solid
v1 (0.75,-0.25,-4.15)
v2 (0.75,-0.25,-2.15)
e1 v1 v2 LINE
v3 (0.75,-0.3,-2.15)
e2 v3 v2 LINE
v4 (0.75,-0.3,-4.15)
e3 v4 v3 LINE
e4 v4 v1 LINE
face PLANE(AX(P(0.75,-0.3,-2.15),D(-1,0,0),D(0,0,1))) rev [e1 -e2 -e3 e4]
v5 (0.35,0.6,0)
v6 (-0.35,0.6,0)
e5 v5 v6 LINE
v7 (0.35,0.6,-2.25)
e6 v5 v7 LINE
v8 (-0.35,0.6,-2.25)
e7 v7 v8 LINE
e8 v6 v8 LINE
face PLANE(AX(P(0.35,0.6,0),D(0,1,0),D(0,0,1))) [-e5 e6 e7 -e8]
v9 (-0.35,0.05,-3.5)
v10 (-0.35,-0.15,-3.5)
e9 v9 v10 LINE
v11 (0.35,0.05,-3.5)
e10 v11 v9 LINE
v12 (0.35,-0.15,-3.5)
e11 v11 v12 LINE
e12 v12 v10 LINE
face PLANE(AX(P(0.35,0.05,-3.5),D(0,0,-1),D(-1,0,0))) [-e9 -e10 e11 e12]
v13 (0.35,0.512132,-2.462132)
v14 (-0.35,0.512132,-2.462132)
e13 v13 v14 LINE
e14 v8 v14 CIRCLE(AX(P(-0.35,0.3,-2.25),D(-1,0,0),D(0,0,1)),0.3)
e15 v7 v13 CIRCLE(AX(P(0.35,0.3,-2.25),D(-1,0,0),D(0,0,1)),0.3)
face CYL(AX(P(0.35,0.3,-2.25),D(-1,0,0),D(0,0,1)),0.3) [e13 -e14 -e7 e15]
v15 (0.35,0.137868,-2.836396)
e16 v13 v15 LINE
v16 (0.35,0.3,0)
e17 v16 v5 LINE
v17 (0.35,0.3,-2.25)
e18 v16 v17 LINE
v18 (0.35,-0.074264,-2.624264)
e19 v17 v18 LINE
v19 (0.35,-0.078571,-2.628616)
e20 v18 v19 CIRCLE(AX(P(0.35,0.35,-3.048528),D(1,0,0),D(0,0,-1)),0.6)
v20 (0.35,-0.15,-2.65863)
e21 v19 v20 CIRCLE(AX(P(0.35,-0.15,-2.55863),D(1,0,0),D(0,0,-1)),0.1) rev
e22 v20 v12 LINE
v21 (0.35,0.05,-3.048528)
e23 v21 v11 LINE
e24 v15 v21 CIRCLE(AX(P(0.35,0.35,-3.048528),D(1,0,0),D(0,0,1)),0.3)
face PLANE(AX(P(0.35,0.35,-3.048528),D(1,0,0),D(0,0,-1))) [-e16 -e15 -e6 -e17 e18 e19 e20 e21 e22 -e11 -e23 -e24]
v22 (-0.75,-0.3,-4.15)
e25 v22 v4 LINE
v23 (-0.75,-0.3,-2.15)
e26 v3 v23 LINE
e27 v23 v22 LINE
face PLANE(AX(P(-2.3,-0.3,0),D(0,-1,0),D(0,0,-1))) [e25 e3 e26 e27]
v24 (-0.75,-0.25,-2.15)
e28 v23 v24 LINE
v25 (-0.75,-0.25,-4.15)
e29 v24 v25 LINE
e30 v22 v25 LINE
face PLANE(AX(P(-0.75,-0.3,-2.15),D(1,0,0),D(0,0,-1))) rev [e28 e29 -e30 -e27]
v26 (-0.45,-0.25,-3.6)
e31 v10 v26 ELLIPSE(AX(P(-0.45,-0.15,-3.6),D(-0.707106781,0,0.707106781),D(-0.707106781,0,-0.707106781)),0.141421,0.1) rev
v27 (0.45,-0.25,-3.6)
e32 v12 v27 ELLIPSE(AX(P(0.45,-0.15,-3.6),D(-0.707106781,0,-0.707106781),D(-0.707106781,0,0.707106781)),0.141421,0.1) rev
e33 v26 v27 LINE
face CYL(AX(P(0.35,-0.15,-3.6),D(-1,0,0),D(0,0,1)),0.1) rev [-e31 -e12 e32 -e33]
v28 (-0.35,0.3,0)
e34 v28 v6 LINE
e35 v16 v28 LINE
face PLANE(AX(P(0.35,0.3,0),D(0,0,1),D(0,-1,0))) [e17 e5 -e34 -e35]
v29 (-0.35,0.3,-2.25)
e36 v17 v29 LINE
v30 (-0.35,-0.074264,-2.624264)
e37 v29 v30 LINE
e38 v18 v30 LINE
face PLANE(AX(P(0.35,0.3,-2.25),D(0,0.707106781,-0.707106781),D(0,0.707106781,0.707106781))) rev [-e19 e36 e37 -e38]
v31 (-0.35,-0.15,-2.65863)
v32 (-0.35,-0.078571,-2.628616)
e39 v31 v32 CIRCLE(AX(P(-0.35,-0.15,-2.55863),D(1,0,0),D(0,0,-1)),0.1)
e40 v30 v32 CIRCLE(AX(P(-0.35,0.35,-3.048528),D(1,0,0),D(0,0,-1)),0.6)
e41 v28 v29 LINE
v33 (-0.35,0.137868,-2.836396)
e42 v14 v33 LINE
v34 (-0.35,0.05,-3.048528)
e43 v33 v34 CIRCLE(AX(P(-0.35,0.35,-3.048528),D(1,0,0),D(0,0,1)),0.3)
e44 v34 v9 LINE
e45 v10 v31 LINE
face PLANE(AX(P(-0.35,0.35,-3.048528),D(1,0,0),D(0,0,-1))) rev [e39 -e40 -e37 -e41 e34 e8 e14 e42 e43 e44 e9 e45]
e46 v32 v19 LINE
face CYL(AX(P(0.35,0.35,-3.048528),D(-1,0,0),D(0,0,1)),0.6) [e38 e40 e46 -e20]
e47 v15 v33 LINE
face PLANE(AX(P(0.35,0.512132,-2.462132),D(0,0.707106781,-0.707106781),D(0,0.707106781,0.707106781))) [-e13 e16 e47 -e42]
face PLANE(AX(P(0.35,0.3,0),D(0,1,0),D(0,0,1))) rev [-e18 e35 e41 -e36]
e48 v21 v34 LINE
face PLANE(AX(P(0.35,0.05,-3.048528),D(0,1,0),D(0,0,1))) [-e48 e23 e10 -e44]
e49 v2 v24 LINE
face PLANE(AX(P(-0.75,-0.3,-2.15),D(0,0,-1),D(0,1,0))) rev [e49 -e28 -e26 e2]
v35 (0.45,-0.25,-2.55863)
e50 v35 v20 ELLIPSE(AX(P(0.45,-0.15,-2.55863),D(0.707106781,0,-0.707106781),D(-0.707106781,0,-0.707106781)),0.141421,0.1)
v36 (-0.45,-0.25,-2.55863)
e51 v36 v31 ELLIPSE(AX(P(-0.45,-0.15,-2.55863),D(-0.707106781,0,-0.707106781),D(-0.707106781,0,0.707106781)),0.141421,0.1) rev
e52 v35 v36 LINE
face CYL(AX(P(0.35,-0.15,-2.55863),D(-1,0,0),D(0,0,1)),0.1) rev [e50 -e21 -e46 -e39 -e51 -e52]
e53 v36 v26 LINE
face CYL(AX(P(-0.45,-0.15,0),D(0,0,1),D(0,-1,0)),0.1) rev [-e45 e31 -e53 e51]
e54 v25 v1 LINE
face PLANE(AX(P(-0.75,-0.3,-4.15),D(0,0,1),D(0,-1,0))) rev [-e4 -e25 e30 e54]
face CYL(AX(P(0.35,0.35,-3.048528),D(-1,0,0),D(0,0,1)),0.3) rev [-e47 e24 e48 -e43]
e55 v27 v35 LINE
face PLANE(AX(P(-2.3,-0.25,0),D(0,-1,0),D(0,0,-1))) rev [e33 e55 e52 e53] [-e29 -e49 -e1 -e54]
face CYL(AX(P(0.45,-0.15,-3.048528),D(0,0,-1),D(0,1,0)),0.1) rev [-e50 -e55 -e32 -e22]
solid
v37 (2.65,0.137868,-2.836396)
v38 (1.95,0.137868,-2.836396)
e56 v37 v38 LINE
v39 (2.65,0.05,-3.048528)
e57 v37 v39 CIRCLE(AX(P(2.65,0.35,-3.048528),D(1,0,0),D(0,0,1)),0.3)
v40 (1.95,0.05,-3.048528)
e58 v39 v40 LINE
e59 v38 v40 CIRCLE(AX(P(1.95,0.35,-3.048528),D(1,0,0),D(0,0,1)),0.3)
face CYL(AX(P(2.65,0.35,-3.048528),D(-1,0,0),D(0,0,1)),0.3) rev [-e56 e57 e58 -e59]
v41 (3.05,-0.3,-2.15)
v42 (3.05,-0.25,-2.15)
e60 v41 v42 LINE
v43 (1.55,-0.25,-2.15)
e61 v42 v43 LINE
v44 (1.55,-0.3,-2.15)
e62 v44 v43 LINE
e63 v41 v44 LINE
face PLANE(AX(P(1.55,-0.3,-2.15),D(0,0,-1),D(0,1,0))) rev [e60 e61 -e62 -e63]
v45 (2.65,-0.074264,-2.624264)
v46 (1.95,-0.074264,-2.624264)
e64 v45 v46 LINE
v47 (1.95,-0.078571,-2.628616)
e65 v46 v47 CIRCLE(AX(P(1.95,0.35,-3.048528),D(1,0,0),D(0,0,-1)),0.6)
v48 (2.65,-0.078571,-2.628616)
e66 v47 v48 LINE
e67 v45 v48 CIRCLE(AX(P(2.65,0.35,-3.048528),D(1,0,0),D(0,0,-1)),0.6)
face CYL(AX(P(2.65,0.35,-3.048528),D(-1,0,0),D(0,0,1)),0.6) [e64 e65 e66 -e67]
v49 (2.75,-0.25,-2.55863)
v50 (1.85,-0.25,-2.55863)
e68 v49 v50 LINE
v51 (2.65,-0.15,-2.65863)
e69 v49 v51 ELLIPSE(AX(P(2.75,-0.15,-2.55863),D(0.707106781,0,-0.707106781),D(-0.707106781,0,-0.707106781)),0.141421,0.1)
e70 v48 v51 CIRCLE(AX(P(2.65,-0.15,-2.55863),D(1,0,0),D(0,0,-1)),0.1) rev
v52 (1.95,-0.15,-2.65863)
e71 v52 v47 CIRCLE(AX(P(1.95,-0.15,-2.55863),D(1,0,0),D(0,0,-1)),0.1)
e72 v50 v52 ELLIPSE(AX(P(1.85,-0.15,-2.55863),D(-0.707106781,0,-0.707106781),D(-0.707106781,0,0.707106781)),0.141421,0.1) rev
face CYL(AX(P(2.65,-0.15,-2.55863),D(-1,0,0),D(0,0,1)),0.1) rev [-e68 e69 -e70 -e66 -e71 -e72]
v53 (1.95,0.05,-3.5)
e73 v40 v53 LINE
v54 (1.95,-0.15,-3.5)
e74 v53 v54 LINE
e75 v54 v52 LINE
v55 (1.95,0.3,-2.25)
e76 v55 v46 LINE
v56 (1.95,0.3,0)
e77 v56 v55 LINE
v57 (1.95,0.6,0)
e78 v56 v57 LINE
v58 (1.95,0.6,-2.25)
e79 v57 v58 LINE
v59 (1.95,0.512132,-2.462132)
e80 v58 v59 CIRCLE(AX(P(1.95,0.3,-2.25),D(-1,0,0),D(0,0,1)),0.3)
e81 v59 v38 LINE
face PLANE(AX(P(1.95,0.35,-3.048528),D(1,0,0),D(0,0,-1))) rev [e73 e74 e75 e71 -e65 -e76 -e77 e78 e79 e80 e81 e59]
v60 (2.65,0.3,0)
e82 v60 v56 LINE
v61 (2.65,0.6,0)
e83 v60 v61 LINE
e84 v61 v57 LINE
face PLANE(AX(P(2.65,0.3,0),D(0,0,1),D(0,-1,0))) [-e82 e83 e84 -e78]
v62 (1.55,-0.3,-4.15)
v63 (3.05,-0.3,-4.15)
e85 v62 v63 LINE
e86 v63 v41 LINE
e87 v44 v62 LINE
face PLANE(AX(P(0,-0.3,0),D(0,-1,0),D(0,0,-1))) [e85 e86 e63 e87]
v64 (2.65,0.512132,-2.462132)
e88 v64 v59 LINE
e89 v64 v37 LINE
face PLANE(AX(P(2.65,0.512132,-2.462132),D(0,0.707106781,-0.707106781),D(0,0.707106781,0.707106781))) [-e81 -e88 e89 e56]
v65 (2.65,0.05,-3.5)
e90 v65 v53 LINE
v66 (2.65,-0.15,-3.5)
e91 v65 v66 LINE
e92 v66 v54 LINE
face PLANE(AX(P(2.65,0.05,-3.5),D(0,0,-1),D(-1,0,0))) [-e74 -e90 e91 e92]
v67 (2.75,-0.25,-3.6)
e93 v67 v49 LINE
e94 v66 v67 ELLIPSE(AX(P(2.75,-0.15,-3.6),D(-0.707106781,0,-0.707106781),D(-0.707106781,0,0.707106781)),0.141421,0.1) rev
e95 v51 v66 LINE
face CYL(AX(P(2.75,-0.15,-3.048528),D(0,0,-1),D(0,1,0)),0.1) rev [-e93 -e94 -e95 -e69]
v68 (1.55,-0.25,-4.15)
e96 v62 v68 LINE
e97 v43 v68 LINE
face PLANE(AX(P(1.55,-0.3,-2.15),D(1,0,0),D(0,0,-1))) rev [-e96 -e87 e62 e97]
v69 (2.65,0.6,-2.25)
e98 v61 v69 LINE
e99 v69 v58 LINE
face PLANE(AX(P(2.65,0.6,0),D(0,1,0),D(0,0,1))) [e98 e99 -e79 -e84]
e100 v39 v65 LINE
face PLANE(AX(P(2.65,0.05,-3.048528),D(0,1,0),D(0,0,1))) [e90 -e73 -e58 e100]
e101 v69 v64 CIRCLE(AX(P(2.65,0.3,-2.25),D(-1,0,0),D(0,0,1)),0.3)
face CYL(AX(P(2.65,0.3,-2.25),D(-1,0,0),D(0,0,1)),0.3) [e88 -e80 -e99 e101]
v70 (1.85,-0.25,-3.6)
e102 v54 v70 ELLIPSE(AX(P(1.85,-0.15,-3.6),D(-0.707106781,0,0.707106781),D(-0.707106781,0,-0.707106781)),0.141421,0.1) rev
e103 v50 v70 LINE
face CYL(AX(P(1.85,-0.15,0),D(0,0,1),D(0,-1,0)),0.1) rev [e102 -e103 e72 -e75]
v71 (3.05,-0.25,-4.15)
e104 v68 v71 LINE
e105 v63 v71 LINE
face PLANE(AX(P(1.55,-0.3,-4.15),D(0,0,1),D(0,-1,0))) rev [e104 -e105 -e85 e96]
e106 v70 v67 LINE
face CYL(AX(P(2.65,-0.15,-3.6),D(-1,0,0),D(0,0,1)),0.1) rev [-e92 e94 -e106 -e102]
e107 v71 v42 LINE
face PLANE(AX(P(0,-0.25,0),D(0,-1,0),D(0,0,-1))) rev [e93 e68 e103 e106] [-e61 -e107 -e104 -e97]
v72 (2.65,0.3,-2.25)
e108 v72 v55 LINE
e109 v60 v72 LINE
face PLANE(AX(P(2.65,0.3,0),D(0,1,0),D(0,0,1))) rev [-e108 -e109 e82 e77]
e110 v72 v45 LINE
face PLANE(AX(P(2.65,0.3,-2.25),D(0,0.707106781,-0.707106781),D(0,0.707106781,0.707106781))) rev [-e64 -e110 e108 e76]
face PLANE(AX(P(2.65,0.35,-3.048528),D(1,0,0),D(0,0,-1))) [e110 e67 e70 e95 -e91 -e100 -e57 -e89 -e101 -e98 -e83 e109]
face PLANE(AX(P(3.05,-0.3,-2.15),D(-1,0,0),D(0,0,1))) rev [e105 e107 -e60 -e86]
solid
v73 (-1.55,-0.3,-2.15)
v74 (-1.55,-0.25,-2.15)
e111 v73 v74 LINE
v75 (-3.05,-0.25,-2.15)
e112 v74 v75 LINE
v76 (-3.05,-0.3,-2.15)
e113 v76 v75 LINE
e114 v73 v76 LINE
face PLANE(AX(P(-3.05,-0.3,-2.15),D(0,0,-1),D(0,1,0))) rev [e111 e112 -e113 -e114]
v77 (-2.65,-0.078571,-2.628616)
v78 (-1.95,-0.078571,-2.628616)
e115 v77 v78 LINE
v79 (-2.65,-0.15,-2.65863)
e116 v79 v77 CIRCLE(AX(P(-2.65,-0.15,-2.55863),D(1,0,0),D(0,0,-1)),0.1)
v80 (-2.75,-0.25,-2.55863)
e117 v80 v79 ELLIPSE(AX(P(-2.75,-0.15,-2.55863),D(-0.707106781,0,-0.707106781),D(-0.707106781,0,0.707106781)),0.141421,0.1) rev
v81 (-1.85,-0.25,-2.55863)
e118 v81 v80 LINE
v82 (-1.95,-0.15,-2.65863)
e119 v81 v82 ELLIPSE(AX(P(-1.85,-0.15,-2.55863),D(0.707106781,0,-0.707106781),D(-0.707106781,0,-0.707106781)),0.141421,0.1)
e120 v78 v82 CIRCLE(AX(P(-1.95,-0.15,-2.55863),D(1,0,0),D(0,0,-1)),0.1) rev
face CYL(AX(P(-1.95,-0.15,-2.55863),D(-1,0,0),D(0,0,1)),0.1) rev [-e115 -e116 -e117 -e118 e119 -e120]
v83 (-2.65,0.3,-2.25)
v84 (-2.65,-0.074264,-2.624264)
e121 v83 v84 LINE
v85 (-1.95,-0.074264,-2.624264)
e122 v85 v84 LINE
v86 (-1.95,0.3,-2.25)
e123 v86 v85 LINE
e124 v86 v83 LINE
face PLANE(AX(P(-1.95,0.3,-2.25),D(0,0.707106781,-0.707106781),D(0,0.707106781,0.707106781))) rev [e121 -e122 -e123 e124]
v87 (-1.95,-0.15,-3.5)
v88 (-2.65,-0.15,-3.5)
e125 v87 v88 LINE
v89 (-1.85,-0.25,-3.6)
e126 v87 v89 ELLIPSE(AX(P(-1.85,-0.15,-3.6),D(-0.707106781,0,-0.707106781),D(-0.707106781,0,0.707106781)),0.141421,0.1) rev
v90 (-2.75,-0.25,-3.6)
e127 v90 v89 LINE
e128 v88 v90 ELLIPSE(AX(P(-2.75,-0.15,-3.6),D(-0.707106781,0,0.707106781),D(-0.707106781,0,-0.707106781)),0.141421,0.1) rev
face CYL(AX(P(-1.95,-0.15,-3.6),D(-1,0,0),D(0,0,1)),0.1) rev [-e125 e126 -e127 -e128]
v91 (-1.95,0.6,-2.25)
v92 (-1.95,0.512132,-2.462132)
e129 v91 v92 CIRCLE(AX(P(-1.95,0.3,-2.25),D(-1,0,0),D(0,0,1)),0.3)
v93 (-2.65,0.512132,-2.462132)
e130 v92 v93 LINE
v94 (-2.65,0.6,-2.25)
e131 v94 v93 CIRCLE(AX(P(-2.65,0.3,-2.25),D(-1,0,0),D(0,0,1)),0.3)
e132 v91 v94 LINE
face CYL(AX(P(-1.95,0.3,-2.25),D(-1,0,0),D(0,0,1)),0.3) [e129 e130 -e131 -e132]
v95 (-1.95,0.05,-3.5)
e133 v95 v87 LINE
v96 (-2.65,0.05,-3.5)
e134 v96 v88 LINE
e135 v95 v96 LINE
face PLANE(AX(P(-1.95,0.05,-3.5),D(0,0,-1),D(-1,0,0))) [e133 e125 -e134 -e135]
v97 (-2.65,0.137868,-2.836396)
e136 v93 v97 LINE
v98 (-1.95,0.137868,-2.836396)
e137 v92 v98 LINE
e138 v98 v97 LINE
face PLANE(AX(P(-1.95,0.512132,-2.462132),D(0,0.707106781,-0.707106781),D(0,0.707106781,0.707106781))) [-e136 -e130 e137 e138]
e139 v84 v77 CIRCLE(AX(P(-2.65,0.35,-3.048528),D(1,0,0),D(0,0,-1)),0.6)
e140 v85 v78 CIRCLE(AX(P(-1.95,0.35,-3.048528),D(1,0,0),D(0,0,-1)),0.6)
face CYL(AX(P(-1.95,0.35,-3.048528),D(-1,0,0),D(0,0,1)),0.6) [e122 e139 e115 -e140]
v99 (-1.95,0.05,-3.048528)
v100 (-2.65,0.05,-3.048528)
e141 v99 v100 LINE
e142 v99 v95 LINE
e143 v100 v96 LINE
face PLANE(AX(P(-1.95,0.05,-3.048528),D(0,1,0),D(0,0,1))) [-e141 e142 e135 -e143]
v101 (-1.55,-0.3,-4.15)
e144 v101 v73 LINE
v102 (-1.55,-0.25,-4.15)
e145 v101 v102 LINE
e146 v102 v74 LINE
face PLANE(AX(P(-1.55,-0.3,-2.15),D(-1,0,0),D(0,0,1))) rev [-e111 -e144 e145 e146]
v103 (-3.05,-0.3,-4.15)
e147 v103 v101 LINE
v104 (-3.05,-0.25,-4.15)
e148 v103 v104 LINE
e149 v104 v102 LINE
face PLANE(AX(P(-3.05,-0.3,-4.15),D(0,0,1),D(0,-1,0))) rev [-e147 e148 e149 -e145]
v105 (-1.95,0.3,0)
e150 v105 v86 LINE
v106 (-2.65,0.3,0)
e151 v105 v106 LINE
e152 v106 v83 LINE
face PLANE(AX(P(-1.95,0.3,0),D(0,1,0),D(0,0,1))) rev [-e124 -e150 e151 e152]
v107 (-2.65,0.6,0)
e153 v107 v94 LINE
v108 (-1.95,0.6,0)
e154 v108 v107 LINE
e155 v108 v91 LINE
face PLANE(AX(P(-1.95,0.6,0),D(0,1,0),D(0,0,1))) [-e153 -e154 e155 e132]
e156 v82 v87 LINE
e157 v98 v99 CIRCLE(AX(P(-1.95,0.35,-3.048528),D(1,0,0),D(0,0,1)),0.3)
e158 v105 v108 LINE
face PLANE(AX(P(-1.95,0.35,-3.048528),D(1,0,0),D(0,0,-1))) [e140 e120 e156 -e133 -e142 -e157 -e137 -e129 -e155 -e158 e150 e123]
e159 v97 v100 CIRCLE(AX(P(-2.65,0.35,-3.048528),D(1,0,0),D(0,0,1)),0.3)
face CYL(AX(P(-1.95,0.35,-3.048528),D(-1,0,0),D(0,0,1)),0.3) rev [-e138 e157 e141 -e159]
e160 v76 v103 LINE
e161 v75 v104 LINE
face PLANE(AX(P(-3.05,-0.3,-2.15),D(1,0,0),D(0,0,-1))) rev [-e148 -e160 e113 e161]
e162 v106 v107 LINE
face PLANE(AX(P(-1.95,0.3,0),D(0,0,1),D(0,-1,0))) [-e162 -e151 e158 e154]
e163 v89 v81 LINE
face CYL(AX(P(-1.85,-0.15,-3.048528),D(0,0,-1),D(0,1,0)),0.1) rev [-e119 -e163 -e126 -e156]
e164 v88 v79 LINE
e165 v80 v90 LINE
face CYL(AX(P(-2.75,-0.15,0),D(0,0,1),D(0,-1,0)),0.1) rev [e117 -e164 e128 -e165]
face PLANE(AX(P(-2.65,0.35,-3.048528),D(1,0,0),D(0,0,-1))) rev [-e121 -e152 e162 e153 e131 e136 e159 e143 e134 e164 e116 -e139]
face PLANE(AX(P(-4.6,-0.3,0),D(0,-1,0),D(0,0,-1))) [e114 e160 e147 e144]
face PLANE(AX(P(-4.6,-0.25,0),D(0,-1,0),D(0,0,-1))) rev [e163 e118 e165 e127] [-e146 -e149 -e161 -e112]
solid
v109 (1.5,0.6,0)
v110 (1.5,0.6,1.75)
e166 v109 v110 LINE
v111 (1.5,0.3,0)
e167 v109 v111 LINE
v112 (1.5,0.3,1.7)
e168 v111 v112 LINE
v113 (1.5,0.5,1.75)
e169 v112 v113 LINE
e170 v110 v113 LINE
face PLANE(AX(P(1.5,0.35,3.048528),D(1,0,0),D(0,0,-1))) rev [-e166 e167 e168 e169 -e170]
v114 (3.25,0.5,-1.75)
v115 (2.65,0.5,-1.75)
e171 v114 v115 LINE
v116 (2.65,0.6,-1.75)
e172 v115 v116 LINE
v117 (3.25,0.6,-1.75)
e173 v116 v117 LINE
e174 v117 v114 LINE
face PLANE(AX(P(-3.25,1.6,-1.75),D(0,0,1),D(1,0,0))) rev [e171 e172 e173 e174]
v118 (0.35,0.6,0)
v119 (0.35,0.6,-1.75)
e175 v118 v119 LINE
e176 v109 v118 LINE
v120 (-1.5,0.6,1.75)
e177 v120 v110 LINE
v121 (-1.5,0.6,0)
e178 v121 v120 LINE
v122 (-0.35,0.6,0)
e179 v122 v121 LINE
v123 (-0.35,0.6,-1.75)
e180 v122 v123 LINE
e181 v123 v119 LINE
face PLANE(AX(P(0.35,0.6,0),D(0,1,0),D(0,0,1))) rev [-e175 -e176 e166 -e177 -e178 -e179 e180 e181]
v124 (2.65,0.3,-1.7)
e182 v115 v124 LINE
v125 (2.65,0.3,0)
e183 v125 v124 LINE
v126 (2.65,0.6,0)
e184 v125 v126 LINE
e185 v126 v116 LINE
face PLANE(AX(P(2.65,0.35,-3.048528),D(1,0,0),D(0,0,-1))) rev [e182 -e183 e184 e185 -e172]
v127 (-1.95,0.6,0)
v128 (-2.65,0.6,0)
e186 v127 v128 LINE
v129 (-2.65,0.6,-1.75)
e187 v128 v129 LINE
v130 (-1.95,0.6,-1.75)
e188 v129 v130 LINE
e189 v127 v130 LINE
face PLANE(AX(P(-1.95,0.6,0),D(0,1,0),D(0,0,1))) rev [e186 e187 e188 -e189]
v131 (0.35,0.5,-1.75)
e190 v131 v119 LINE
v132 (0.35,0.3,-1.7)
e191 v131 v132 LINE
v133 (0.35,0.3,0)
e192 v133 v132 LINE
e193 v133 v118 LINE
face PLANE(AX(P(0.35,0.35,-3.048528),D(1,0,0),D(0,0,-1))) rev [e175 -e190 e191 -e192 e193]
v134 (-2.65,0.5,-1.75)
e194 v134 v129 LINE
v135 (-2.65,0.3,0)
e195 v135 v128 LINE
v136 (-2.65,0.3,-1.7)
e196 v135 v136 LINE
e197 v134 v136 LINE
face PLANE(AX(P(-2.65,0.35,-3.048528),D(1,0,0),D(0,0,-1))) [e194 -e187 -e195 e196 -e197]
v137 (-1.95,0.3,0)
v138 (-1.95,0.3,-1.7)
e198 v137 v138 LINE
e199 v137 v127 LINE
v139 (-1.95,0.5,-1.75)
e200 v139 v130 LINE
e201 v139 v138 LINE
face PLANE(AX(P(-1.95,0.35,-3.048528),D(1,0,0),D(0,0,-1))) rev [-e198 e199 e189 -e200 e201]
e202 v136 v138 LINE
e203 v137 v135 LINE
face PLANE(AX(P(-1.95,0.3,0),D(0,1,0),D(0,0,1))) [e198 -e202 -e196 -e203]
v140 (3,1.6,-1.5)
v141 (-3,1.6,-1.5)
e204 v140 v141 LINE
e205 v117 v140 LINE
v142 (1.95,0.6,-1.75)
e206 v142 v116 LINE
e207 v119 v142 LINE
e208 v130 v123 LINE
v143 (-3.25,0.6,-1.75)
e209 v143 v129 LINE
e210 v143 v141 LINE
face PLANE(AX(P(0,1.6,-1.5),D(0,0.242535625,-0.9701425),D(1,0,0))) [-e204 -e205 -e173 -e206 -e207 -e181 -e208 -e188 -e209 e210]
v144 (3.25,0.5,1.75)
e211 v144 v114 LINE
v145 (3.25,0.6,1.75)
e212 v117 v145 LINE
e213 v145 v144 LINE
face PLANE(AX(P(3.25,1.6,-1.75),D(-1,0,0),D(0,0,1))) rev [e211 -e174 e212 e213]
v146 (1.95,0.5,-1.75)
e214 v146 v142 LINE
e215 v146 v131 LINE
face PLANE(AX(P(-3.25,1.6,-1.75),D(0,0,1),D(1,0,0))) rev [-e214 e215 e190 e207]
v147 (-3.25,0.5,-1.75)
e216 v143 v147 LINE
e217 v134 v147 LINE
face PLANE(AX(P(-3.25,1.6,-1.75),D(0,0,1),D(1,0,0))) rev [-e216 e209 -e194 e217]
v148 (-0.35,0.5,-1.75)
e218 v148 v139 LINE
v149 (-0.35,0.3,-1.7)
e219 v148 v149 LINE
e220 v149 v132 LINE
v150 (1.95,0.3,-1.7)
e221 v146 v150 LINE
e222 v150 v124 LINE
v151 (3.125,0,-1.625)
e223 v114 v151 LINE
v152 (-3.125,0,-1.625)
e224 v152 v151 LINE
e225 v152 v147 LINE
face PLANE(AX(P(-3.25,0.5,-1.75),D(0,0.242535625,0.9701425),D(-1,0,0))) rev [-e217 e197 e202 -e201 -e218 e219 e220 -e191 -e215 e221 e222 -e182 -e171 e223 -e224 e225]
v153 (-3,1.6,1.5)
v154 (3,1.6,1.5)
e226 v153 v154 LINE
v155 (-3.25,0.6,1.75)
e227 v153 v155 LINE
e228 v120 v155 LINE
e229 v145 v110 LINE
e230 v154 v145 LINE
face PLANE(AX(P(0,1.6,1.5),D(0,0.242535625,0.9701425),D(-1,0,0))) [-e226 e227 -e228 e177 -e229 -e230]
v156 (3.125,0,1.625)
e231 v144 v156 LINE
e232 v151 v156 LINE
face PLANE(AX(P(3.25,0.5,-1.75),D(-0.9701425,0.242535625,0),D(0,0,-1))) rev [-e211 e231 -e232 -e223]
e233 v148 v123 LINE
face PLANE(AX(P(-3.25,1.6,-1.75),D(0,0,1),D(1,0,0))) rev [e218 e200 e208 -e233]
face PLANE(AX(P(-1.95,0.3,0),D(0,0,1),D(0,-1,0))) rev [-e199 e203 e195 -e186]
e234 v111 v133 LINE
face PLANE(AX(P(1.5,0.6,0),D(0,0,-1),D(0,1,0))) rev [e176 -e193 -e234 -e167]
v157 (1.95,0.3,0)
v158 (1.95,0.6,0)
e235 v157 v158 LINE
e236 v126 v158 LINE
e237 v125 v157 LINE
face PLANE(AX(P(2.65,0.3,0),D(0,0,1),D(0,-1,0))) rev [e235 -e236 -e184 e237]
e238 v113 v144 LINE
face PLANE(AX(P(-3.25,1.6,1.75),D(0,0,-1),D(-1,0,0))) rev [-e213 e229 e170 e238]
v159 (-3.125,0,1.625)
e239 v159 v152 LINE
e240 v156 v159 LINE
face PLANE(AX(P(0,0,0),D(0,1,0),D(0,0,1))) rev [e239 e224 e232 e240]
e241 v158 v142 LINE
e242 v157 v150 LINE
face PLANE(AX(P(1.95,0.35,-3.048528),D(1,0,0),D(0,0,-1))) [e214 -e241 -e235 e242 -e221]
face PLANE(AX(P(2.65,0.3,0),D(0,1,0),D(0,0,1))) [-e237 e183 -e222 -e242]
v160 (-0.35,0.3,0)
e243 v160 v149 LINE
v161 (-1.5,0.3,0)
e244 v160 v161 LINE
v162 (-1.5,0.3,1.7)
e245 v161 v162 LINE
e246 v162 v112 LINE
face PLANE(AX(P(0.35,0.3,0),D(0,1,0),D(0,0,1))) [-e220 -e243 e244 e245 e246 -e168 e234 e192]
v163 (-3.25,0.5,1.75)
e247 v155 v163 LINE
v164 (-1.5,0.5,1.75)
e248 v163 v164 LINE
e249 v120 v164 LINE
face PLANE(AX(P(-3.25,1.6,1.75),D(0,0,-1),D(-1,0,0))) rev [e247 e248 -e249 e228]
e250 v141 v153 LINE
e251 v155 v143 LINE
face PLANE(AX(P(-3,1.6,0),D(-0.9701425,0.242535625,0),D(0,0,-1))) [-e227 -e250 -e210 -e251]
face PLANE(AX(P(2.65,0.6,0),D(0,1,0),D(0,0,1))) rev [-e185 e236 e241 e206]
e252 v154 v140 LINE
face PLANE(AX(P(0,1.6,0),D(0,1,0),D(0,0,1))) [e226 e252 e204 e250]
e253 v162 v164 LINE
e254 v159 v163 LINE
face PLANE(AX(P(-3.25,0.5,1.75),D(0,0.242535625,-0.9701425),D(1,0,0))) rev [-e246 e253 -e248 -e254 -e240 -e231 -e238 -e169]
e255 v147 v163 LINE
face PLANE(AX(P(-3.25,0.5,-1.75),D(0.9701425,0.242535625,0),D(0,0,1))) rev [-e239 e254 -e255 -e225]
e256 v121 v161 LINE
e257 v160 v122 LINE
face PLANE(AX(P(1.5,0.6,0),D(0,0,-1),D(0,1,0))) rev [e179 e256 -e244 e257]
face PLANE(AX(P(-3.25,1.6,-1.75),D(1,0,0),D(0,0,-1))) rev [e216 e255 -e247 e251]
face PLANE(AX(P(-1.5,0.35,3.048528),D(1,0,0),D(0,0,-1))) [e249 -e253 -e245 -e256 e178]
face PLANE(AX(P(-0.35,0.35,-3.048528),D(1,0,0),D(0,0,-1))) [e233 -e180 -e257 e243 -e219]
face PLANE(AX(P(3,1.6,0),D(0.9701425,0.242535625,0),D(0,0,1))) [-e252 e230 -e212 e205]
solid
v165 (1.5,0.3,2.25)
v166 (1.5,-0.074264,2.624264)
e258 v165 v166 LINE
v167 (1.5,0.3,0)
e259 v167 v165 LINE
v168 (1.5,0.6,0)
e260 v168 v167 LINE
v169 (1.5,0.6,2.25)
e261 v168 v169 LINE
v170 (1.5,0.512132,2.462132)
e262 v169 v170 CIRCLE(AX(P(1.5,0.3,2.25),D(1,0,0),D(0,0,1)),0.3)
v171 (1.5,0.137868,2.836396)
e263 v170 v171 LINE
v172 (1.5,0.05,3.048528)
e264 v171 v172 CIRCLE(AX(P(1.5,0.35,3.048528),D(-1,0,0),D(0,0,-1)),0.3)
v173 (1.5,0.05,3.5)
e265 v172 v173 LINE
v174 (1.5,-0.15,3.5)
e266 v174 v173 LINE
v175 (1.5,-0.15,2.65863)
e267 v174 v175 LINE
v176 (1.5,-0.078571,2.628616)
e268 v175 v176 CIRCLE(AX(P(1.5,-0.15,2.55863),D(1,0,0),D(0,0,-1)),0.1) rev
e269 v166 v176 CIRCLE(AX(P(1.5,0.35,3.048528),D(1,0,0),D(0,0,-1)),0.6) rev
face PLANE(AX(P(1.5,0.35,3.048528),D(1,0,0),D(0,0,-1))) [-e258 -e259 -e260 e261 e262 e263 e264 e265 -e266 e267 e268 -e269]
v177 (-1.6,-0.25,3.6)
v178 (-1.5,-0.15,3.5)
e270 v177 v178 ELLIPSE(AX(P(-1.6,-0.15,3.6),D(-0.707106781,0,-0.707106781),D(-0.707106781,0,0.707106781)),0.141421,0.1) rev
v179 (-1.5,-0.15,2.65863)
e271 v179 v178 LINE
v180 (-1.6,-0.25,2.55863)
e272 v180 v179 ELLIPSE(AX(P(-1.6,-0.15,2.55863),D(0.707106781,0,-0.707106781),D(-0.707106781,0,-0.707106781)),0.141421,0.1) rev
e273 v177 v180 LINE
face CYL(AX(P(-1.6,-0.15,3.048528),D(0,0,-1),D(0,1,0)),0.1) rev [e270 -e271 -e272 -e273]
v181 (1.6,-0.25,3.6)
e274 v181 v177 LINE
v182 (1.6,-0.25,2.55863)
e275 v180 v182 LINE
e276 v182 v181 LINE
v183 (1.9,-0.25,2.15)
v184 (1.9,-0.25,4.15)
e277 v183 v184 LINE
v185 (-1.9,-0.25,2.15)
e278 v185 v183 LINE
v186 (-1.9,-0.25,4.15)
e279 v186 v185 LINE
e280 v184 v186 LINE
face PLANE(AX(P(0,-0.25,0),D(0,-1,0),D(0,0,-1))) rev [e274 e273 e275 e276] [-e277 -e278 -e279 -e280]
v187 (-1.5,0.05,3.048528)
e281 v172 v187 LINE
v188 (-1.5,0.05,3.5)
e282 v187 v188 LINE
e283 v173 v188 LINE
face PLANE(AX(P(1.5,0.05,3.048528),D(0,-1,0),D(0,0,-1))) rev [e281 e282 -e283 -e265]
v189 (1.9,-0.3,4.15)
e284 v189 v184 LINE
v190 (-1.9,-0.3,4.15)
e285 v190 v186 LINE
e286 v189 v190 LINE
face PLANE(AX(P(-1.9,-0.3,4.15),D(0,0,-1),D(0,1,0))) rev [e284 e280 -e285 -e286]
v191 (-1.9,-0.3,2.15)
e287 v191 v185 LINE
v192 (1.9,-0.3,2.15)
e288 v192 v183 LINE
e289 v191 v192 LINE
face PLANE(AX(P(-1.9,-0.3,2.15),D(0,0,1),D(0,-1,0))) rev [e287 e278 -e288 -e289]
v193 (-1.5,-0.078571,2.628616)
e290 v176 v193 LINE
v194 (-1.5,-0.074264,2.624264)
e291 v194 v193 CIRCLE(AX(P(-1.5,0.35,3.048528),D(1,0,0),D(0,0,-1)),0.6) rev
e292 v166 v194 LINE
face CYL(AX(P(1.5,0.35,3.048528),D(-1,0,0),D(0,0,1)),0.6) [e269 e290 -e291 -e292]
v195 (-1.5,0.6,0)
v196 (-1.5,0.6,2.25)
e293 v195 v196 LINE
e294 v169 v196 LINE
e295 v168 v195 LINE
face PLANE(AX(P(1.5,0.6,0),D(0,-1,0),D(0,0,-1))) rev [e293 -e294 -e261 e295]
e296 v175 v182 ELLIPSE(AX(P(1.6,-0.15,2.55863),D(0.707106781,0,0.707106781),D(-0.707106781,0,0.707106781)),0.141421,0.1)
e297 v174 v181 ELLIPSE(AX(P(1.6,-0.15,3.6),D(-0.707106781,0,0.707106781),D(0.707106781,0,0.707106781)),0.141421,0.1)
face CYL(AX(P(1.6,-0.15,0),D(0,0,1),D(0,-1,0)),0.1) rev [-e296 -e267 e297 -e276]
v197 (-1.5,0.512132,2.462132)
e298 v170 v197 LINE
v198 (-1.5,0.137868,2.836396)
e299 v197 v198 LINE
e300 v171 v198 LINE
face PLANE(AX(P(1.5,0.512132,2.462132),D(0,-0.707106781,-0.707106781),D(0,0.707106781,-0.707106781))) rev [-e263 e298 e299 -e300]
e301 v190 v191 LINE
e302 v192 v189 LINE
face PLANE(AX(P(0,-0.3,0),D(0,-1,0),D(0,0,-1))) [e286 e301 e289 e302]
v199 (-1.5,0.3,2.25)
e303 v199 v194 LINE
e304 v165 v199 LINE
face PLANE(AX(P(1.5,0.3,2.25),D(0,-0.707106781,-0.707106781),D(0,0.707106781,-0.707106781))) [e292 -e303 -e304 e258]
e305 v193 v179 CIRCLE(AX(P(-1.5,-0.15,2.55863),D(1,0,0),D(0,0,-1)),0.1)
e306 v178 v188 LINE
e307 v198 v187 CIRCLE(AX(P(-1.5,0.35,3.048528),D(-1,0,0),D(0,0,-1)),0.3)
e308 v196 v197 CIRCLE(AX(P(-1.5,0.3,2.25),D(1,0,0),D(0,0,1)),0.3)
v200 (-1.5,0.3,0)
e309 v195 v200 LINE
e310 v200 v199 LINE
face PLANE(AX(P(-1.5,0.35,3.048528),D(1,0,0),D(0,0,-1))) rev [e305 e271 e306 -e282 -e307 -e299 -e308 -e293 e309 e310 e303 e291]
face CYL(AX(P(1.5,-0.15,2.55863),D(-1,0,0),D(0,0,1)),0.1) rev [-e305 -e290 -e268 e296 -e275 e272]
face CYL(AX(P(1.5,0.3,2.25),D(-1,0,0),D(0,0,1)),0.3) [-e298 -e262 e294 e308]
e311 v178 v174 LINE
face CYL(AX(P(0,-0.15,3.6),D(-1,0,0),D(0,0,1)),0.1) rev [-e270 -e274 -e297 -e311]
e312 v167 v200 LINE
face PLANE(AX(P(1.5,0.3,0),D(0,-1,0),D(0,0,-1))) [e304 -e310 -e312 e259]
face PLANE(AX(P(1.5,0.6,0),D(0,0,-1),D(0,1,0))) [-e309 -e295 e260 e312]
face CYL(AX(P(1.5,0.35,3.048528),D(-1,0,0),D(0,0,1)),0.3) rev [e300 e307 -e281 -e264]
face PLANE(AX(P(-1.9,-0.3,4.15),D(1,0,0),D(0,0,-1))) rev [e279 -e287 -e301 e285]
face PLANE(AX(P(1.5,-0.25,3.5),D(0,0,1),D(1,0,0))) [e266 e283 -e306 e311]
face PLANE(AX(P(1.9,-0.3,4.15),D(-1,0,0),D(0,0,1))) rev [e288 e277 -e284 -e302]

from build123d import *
from OCP.BRepFilletAPI import BRepFilletAPI_MakeChamfer

# Parameters (mm, degrees)
BOSS_EXTRUDE1_DEPTH   = 1.6
CHAMFER1_SIZE         = 1
CHAMFER1_SIZE2        = 0.25
CHAMFER2_SIZE         = 0.125
CHAMFER2_SIZE2        = 0.5
EXTRUDE_THIN1_DEPTH   = 1.5
EXTRUDE_THIN2_DEPTH   = 0.35
BOSS_EXTRUDE2_DEPTH   = 0.05
FILLET1_R             = 0.1
FILLET2_R             = 0.1
LPATTERN1_START       = -2.75
LPATTERN1_DEPTH       = 0.9
LPATTERN1_START_2     = -3.05
LPATTERN1_2_OUTLINE_W = 0.04999999999999999
LPATTERN1_2_OUTLINE_H = 2.0000000000000004
LPATTERN1_2_DEPTH     = 1.5
LPATTERN1_START_3     = -5
LPATTERN1_3_DEPTH     = 5
LPATTERN1_START_4     = -0.45
LPATTERN1_4_DEPTH     = 0.9
LPATTERN1_START_5     = -0.75
LPATTERN1_5_OUTLINE_W = 0.04999999999999999
LPATTERN1_5_OUTLINE_H = 2.0000000000000004
LPATTERN1_5_DEPTH     = 1.5
LPATTERN1_6_DEPTH     = 5
INDENT1_START         = -1.5
INDENT1_DEPTH         = 3
INDENT1_START_2       = -2.65
INDENT1_2_DEPTH       = 0.7
INDENT1_START_3       = -0.35
INDENT1_3_DEPTH       = 0.7
INDENT1_START_4       = 1.95
INDENT1_4_DEPTH       = 0.7


with BuildPart() as part:
    # Sketch1 → Boss-Extrude1 (new body)
    with BuildSketch(Plane(origin=(0, 0, 0), x_dir=(1, 0, 0), z_dir=(0, 1, 0))):
        Polygon((-3.2500000000000004, 1.7500000000000002), (3.2499999999999996, 1.7500000000000002), (3.25, -1.75), (-3.2500000000000004, -1.749999999999998), align=None)
    extrude(amount=BOSS_EXTRUDE1_DEPTH)

    # Chamfer1: one chamfer whose edges measure the first distance from different faces: ONE call of the kernel's chamfer builder (chamfer() names one face for all edges)
    chamfer1_edges_1 = [part.edges().sort_by_distance(p)[0] for p in [
        (-3.2500000000000004, 1.6, -1.11e-15),
    ]]
    chamfer1_side_1 = [part.faces().sort_by_distance(p)[0] for p in [
        (-3.2500000000000004, 0.8, -1.17e-15),
    ]]
    chamfer1_edges_2 = [part.edges().sort_by_distance(p)[0] for p in [
        (0, 1.6, 1.7499999999999991),
    ]]
    chamfer1_side_2 = [part.faces().sort_by_distance(p)[0] for p in [
        (-6e-17, 0.8, 1.7499999999999991),
    ]]
    chamfer1_edges_3 = [part.edges().sort_by_distance(p)[0] for p in [
        (3.25, 1.6, -2.2e-16),
    ]]
    chamfer1_side_3 = [part.faces().sort_by_distance(p)[0] for p in [
        (3.25, 0.8, -1.6e-16),
    ]]
    chamfer1_edges_4 = [part.edges().sort_by_distance(p)[0] for p in [
        (-4.4e-16, 1.6, -1.7500000000000002),
    ]]
    chamfer1_side_4 = [part.faces().sort_by_distance(p)[0] for p in [
        (-4.3e-16, 0.8, -1.7500000000000002),
    ]]
    chamfer1 = BRepFilletAPI_MakeChamfer(part.part.solid().wrapped)
    for e in chamfer1_edges_1:
        chamfer1.Add(CHAMFER1_SIZE, CHAMFER1_SIZE2, e.wrapped, chamfer1_side_1[0].wrapped)  # the first distance lies on this face
    for e in chamfer1_edges_2:
        chamfer1.Add(CHAMFER1_SIZE, CHAMFER1_SIZE2, e.wrapped, chamfer1_side_2[0].wrapped)  # the first distance lies on this face
    for e in chamfer1_edges_3:
        chamfer1.Add(CHAMFER1_SIZE, CHAMFER1_SIZE2, e.wrapped, chamfer1_side_3[0].wrapped)  # the first distance lies on this face
    for e in chamfer1_edges_4:
        chamfer1.Add(CHAMFER1_SIZE, CHAMFER1_SIZE2, e.wrapped, chamfer1_side_4[0].wrapped)  # the first distance lies on this face
    add(Compound.cast(chamfer1.Shape()), mode=Mode.REPLACE)

    # Chamfer2
    chamfer2_edges = [part.edges().sort_by_distance(p)[0] for p in [
        (0, 0, 1.7499999999999991),
        (-3.2500000000000004, 0, -1.11e-15),
        (-4.4e-16, 0, -1.7500000000000002),
        (3.25, 0, -2.2e-16),
    ]]
    chamfer2_side = [part.faces().sort_by_distance(p)[0] for p in [
        (4e-17, 0, -5.8e-16),
    ]]
    chamfer(chamfer2_edges, length=CHAMFER2_SIZE, length2=CHAMFER2_SIZE2, reference=chamfer2_side[0])

    # Indent1: read off the stored shape, not the designer's step
    # Indent1 outline → Indent1 (cut)
    with BuildSketch(Plane.YZ.offset(INDENT1_START)):
        Polygon((0.3, 0), (0.6, 0), (0.6, 1.75), (0.5, 1.75), (0.3, 1.7), align=None)
    extrude(amount=INDENT1_DEPTH, mode=Mode.SUBTRACT)

    # Indent1 2 outline → Indent1 2 (cut)
    with BuildSketch(Plane.YZ.offset(INDENT1_START_2)):
        Polygon((0.5, -1.75), (0.6, -1.75), (0.6, 0), (0.3, 0), (0.3, -1.7), align=None)
    extrude(amount=INDENT1_2_DEPTH, mode=Mode.SUBTRACT)

    # Indent1 3 outline → Indent1 3 (cut)
    with BuildSketch(Plane.YZ.offset(INDENT1_START_3)):
        Polygon((0.5, -1.75), (0.6, -1.75), (0.6, 0), (0.3, 0), (0.3, -1.7), align=None)
    extrude(amount=INDENT1_3_DEPTH, mode=Mode.SUBTRACT)

    # Indent1 4 outline → Indent1 4 (cut)
    with BuildSketch(Plane.YZ.offset(INDENT1_START_4)):
        Polygon((0.5, -1.75), (0.6, -1.75), (0.6, 0), (0.3, 0), (0.3, -1.7), align=None)
    extrude(amount=INDENT1_4_DEPTH, mode=Mode.SUBTRACT)


with BuildPart() as body_2:
    # Sketch2 → Extrude-Thin1 (new, symmetric)
    with BuildSketch(Plane(origin=(0, 0, 0), x_dir=(0, 0, -1), z_dir=(1, 0, 0))):
        with BuildLine():
            Line((0, 0.6), (-2.25, 0.5999999999999998))
            ThreePointArc((-2.25, 0.5999999999999998), (-2.3648050297095278, 0.577163859753389), (-2.4621320343559647, 0.5121320343559638))
            Line((-2.4621320343559647, 0.5121320343559638), (-2.836396103067891, 0.13786796564403583))
            ThreePointArc((-2.836396103067891, 0.13786796564403583), (-2.9337231077143313, 0.07283614024661894), (-3.048528137423855, 0.04999999999999964))
            Line((-3.048528137423855, 0.04999999999999964), (-3.5, 0.04999999999999957))
            Line((-3.5, 0.04999999999999957), (-3.5, -0.25000000000000044))
            Line((-3.5, -0.25000000000000044), (-3.048528137423855, -0.25000000000000033))
            ThreePointArc((-3.048528137423839, -0.2500000000000004), (-2.8189180780047915, -0.20432771950676182), (-2.6242640687119105, -0.07426406871192798))
            Line((-2.624264068711926, -0.07426406871192787), (-2.25, 0.30000000000000004))
            Line((-2.25, 0.29999999999999977), (3e-17, 0.3))
            Line((3e-17, 0.3), (0, 0.6))
        make_face()
    extrude(amount=EXTRUDE_THIN1_DEPTH, both=True)



with BuildPart() as body_3:
    # Sketch3 → Extrude-Thin2 (new, symmetric)
    with BuildSketch(Plane(origin=(2.3, 0, 0), x_dir=(0, 0, -1), z_dir=(1, 0, 0))):
        with BuildLine():
            Line((0, 0.6), (2.25, 0.5999999999999998))
            ThreePointArc((2.25, 0.5999999999999998), (2.364805029709526, 0.5771638597533844), (2.4621320343559647, 0.5121320343559636))
            Line((2.4621320343559647, 0.5121320343559636), (2.836396103067891, 0.13786796564403606))
            ThreePointArc((2.836396103067891, 0.13786796564403606), (2.933723107714331, 0.0728361402466185), (3.048528137423855, 0.05000000000000013))
            Line((3.048528137423855, 0.05000000000000013), (3.5, 0.05000000000000001))
            Line((3.5, 0.05000000000000001), (3.5, -0.24999999999999997))
            Line((3.5, -0.24999999999999997), (3.048528137423855, -0.24999999999999986))
            ThreePointArc((3.0485281374238418, -0.24999999999999994), (2.8189180780047933, -0.20432771950676315), (2.6242640687119128, -0.07426406871192781))
            Line((2.624264068711926, -0.07426406871192778), (2.25, 0.2999999999999997))
            Line((2.25, 0.29999999999999977), (-3e-17, 0.3))
            Line((-3e-17, 0.3), (0, 0.6))
        make_face()
    extrude(amount=EXTRUDE_THIN2_DEPTH, both=True)


with BuildPart() as body_2_1:
    add(body_2.part)

    add(body_3.part)  # Boss-Extrude2 merges body 3
    # Sketch4 → Boss-Extrude2 (add)
    with BuildSketch(Plane.XZ.offset(0.24999999999999903)):
        Polygon((1.5499999999999998, -2.1499999999999995), (3.05, -2.1499999999999995), (3.05, -4.1499999999999995), (1.55, -4.1499999999999995), align=None)
        Polygon((-1.8999999999999984, 4.1499999999999995), (1.9000000000000012, 4.15), (1.9000000000000017, 2.149999999999999), (-1.8999999999999984, 2.149999999999999), align=None)
    extrude(amount=BOSS_EXTRUDE2_DEPTH)

    # Fillet1
    fillet1_edges = [body_2_1.edges().sort_by_distance(p)[0] for p in [
        (1.9499999999999997, -0.24999999999999992, -3.2742640687119273),
        (2.3, -0.2499999999999999, -3.0485281374238484),
        (2.3, -0.24999999999999997, -3.5),
        (2.65, -0.24999999999999992, -3.2742640687119273),
    ]]
    fillet(fillet1_edges, radius=FILLET1_R)

    # Fillet2
    fillet2_edges = [body_2_1.edges().sort_by_distance(p)[0] for p in [
        (1.5, -0.2500000000000004, 3.2742640687119273),
        (-1.5, -0.2500000000000004, 3.2742640687119273),
        (0, -0.25000000000000033, 3.048528137423847),
        (0, -0.25000000000000044, 3.5),
    ]]
    fillet(fillet2_edges, radius=FILLET2_R)


with BuildPart() as body_3_2:
    # LPattern1: read off the stored shape, not the designer's step
    # LPattern1 outline → LPattern1 (new body)
    with BuildSketch(Plane.YZ.offset(LPATTERN1_START)):
        with BuildLine():
            ThreePointArc((-0.25, -3.6), (-0.220710678, -3.529289322), (-0.15, -3.5))
            Line((-0.15, -3.5), (0.05, -3.5))
            Line((0.05, -3.5), (0.05, -3.048528137))
            ThreePointArc((0.05, -3.048528137), (0.07283614, -2.933723107), (0.137867966, -2.836396103))
            Line((0.137867966, -2.836396103), (0.512132034, -2.462132034))
            ThreePointArc((0.512132034, -2.462132034), (0.57716386, -2.36480503), (0.6, -2.25))
            Line((0.6, -2.25), (0.6, 0))
            Line((0.6, 0), (0.3, 0))
            Line((0.3, 0), (0.3, -2.25))
            Line((0.3, -2.25), (-0.074264069, -2.624264069))
            ThreePointArc((-0.074264069, -2.624264069), (-0.076423299, -2.626434345), (-0.078571429, -2.62861561))
            ThreePointArc((-0.078571429, -2.62861561), (-0.187796447, -2.651212199), (-0.25, -2.558630189))
            Line((-0.25, -2.558630189), (-0.25, -2.15))
            Line((-0.25, -2.15), (-0.3, -2.15))
            Line((-0.3, -2.15), (-0.3, -4.15))
            Line((-0.3, -4.15), (-0.25, -4.15))
            Line((-0.25, -4.15), (-0.25, -3.6))
        make_face()
    extrude(amount=LPATTERN1_DEPTH)

    # LPattern1 2 outline → LPattern1 2 (add)
    with BuildSketch(Plane.YZ.offset(LPATTERN1_START_2)):
        with Locations((-0.275, -3.1500000000000004)):
            Rectangle(LPATTERN1_2_OUTLINE_W, LPATTERN1_2_OUTLINE_H)
    extrude(amount=LPATTERN1_2_DEPTH)

    # LPattern1 3 outline → LPattern1 3 (cut)
    with BuildSketch(Plane.XY.offset(LPATTERN1_START_3)):
        with BuildLine():
            ThreePointArc((-1.95, -0.15), (-1.920710678, -0.220710678), (-1.85, -0.25))
            Line((-1.85, -0.25), (-1.85, 0.6))
            Line((-1.85, 0.6), (-1.95, 0.6))
            Line((-1.95, 0.6), (-1.95, -0.15))
        make_face()
        with BuildLine():
            ThreePointArc((-2.75, -0.25), (-2.679289322, -0.220710678), (-2.65, -0.15))
            Line((-2.65, -0.15), (-2.65, 0.6))
            Line((-2.65, 0.6), (-2.75, 0.6))
            Line((-2.75, 0.6), (-2.75, -0.25))
        make_face()
    extrude(amount=LPATTERN1_3_DEPTH, mode=Mode.SUBTRACT)


with BuildPart() as body_4:
    # LPattern1 4 outline → LPattern1 4 (new body)
    with BuildSketch(Plane.YZ.offset(LPATTERN1_START_4)):
        with BuildLine():
            ThreePointArc((-0.25, -3.6), (-0.220710678, -3.529289322), (-0.15, -3.5))
            Line((-0.15, -3.5), (0.05, -3.5))
            Line((0.05, -3.5), (0.05, -3.048528137))
            ThreePointArc((0.05, -3.048528137), (0.07283614, -2.933723107), (0.137867966, -2.836396103))
            Line((0.137867966, -2.836396103), (0.512132034, -2.462132034))
            ThreePointArc((0.512132034, -2.462132034), (0.57716386, -2.36480503), (0.6, -2.25))
            Line((0.6, -2.25), (0.6, 0))
            Line((0.6, 0), (0.3, 0))
            Line((0.3, 0), (0.3, -2.25))
            Line((0.3, -2.25), (-0.074264069, -2.624264069))
            ThreePointArc((-0.074264069, -2.624264069), (-0.076423299, -2.626434345), (-0.078571429, -2.62861561))
            ThreePointArc((-0.078571429, -2.62861561), (-0.187796447, -2.651212199), (-0.25, -2.558630189))
            Line((-0.25, -2.558630189), (-0.25, -2.15))
            Line((-0.25, -2.15), (-0.3, -2.15))
            Line((-0.3, -2.15), (-0.3, -4.15))
            Line((-0.3, -4.15), (-0.25, -4.15))
            Line((-0.25, -4.15), (-0.25, -3.6))
        make_face()
    extrude(amount=LPATTERN1_4_DEPTH)

    # LPattern1 5 outline → LPattern1 5 (add)
    with BuildSketch(Plane.YZ.offset(LPATTERN1_START_5)):
        with Locations((-0.275, -3.1500000000000004)):
            Rectangle(LPATTERN1_5_OUTLINE_W, LPATTERN1_5_OUTLINE_H)
    extrude(amount=LPATTERN1_5_DEPTH)

    # LPattern1 6 outline → LPattern1 6 (cut)
    with BuildSketch(Plane.XY.offset(LPATTERN1_START_3)):
        with BuildLine():
            ThreePointArc((0.35, -0.15), (0.379289322, -0.220710678), (0.45, -0.25))
            Line((0.45, -0.25), (0.45, 0.6))
            Line((0.45, 0.6), (0.35, 0.6))
            Line((0.35, 0.6), (0.35, -0.15))
        make_face()
        with BuildLine():
            ThreePointArc((-0.45, -0.25), (-0.379289322, -0.220710678), (-0.35, -0.15))
            Line((-0.35, -0.15), (-0.35, 0.6))
            Line((-0.35, 0.6), (-0.45, 0.6))
            Line((-0.45, 0.6), (-0.45, -0.25))
        make_face()
    extrude(amount=LPATTERN1_6_DEPTH, mode=Mode.SUBTRACT)


solid = Compound([part.part, body_2_1.part, body_3_2.part, body_4.part])
